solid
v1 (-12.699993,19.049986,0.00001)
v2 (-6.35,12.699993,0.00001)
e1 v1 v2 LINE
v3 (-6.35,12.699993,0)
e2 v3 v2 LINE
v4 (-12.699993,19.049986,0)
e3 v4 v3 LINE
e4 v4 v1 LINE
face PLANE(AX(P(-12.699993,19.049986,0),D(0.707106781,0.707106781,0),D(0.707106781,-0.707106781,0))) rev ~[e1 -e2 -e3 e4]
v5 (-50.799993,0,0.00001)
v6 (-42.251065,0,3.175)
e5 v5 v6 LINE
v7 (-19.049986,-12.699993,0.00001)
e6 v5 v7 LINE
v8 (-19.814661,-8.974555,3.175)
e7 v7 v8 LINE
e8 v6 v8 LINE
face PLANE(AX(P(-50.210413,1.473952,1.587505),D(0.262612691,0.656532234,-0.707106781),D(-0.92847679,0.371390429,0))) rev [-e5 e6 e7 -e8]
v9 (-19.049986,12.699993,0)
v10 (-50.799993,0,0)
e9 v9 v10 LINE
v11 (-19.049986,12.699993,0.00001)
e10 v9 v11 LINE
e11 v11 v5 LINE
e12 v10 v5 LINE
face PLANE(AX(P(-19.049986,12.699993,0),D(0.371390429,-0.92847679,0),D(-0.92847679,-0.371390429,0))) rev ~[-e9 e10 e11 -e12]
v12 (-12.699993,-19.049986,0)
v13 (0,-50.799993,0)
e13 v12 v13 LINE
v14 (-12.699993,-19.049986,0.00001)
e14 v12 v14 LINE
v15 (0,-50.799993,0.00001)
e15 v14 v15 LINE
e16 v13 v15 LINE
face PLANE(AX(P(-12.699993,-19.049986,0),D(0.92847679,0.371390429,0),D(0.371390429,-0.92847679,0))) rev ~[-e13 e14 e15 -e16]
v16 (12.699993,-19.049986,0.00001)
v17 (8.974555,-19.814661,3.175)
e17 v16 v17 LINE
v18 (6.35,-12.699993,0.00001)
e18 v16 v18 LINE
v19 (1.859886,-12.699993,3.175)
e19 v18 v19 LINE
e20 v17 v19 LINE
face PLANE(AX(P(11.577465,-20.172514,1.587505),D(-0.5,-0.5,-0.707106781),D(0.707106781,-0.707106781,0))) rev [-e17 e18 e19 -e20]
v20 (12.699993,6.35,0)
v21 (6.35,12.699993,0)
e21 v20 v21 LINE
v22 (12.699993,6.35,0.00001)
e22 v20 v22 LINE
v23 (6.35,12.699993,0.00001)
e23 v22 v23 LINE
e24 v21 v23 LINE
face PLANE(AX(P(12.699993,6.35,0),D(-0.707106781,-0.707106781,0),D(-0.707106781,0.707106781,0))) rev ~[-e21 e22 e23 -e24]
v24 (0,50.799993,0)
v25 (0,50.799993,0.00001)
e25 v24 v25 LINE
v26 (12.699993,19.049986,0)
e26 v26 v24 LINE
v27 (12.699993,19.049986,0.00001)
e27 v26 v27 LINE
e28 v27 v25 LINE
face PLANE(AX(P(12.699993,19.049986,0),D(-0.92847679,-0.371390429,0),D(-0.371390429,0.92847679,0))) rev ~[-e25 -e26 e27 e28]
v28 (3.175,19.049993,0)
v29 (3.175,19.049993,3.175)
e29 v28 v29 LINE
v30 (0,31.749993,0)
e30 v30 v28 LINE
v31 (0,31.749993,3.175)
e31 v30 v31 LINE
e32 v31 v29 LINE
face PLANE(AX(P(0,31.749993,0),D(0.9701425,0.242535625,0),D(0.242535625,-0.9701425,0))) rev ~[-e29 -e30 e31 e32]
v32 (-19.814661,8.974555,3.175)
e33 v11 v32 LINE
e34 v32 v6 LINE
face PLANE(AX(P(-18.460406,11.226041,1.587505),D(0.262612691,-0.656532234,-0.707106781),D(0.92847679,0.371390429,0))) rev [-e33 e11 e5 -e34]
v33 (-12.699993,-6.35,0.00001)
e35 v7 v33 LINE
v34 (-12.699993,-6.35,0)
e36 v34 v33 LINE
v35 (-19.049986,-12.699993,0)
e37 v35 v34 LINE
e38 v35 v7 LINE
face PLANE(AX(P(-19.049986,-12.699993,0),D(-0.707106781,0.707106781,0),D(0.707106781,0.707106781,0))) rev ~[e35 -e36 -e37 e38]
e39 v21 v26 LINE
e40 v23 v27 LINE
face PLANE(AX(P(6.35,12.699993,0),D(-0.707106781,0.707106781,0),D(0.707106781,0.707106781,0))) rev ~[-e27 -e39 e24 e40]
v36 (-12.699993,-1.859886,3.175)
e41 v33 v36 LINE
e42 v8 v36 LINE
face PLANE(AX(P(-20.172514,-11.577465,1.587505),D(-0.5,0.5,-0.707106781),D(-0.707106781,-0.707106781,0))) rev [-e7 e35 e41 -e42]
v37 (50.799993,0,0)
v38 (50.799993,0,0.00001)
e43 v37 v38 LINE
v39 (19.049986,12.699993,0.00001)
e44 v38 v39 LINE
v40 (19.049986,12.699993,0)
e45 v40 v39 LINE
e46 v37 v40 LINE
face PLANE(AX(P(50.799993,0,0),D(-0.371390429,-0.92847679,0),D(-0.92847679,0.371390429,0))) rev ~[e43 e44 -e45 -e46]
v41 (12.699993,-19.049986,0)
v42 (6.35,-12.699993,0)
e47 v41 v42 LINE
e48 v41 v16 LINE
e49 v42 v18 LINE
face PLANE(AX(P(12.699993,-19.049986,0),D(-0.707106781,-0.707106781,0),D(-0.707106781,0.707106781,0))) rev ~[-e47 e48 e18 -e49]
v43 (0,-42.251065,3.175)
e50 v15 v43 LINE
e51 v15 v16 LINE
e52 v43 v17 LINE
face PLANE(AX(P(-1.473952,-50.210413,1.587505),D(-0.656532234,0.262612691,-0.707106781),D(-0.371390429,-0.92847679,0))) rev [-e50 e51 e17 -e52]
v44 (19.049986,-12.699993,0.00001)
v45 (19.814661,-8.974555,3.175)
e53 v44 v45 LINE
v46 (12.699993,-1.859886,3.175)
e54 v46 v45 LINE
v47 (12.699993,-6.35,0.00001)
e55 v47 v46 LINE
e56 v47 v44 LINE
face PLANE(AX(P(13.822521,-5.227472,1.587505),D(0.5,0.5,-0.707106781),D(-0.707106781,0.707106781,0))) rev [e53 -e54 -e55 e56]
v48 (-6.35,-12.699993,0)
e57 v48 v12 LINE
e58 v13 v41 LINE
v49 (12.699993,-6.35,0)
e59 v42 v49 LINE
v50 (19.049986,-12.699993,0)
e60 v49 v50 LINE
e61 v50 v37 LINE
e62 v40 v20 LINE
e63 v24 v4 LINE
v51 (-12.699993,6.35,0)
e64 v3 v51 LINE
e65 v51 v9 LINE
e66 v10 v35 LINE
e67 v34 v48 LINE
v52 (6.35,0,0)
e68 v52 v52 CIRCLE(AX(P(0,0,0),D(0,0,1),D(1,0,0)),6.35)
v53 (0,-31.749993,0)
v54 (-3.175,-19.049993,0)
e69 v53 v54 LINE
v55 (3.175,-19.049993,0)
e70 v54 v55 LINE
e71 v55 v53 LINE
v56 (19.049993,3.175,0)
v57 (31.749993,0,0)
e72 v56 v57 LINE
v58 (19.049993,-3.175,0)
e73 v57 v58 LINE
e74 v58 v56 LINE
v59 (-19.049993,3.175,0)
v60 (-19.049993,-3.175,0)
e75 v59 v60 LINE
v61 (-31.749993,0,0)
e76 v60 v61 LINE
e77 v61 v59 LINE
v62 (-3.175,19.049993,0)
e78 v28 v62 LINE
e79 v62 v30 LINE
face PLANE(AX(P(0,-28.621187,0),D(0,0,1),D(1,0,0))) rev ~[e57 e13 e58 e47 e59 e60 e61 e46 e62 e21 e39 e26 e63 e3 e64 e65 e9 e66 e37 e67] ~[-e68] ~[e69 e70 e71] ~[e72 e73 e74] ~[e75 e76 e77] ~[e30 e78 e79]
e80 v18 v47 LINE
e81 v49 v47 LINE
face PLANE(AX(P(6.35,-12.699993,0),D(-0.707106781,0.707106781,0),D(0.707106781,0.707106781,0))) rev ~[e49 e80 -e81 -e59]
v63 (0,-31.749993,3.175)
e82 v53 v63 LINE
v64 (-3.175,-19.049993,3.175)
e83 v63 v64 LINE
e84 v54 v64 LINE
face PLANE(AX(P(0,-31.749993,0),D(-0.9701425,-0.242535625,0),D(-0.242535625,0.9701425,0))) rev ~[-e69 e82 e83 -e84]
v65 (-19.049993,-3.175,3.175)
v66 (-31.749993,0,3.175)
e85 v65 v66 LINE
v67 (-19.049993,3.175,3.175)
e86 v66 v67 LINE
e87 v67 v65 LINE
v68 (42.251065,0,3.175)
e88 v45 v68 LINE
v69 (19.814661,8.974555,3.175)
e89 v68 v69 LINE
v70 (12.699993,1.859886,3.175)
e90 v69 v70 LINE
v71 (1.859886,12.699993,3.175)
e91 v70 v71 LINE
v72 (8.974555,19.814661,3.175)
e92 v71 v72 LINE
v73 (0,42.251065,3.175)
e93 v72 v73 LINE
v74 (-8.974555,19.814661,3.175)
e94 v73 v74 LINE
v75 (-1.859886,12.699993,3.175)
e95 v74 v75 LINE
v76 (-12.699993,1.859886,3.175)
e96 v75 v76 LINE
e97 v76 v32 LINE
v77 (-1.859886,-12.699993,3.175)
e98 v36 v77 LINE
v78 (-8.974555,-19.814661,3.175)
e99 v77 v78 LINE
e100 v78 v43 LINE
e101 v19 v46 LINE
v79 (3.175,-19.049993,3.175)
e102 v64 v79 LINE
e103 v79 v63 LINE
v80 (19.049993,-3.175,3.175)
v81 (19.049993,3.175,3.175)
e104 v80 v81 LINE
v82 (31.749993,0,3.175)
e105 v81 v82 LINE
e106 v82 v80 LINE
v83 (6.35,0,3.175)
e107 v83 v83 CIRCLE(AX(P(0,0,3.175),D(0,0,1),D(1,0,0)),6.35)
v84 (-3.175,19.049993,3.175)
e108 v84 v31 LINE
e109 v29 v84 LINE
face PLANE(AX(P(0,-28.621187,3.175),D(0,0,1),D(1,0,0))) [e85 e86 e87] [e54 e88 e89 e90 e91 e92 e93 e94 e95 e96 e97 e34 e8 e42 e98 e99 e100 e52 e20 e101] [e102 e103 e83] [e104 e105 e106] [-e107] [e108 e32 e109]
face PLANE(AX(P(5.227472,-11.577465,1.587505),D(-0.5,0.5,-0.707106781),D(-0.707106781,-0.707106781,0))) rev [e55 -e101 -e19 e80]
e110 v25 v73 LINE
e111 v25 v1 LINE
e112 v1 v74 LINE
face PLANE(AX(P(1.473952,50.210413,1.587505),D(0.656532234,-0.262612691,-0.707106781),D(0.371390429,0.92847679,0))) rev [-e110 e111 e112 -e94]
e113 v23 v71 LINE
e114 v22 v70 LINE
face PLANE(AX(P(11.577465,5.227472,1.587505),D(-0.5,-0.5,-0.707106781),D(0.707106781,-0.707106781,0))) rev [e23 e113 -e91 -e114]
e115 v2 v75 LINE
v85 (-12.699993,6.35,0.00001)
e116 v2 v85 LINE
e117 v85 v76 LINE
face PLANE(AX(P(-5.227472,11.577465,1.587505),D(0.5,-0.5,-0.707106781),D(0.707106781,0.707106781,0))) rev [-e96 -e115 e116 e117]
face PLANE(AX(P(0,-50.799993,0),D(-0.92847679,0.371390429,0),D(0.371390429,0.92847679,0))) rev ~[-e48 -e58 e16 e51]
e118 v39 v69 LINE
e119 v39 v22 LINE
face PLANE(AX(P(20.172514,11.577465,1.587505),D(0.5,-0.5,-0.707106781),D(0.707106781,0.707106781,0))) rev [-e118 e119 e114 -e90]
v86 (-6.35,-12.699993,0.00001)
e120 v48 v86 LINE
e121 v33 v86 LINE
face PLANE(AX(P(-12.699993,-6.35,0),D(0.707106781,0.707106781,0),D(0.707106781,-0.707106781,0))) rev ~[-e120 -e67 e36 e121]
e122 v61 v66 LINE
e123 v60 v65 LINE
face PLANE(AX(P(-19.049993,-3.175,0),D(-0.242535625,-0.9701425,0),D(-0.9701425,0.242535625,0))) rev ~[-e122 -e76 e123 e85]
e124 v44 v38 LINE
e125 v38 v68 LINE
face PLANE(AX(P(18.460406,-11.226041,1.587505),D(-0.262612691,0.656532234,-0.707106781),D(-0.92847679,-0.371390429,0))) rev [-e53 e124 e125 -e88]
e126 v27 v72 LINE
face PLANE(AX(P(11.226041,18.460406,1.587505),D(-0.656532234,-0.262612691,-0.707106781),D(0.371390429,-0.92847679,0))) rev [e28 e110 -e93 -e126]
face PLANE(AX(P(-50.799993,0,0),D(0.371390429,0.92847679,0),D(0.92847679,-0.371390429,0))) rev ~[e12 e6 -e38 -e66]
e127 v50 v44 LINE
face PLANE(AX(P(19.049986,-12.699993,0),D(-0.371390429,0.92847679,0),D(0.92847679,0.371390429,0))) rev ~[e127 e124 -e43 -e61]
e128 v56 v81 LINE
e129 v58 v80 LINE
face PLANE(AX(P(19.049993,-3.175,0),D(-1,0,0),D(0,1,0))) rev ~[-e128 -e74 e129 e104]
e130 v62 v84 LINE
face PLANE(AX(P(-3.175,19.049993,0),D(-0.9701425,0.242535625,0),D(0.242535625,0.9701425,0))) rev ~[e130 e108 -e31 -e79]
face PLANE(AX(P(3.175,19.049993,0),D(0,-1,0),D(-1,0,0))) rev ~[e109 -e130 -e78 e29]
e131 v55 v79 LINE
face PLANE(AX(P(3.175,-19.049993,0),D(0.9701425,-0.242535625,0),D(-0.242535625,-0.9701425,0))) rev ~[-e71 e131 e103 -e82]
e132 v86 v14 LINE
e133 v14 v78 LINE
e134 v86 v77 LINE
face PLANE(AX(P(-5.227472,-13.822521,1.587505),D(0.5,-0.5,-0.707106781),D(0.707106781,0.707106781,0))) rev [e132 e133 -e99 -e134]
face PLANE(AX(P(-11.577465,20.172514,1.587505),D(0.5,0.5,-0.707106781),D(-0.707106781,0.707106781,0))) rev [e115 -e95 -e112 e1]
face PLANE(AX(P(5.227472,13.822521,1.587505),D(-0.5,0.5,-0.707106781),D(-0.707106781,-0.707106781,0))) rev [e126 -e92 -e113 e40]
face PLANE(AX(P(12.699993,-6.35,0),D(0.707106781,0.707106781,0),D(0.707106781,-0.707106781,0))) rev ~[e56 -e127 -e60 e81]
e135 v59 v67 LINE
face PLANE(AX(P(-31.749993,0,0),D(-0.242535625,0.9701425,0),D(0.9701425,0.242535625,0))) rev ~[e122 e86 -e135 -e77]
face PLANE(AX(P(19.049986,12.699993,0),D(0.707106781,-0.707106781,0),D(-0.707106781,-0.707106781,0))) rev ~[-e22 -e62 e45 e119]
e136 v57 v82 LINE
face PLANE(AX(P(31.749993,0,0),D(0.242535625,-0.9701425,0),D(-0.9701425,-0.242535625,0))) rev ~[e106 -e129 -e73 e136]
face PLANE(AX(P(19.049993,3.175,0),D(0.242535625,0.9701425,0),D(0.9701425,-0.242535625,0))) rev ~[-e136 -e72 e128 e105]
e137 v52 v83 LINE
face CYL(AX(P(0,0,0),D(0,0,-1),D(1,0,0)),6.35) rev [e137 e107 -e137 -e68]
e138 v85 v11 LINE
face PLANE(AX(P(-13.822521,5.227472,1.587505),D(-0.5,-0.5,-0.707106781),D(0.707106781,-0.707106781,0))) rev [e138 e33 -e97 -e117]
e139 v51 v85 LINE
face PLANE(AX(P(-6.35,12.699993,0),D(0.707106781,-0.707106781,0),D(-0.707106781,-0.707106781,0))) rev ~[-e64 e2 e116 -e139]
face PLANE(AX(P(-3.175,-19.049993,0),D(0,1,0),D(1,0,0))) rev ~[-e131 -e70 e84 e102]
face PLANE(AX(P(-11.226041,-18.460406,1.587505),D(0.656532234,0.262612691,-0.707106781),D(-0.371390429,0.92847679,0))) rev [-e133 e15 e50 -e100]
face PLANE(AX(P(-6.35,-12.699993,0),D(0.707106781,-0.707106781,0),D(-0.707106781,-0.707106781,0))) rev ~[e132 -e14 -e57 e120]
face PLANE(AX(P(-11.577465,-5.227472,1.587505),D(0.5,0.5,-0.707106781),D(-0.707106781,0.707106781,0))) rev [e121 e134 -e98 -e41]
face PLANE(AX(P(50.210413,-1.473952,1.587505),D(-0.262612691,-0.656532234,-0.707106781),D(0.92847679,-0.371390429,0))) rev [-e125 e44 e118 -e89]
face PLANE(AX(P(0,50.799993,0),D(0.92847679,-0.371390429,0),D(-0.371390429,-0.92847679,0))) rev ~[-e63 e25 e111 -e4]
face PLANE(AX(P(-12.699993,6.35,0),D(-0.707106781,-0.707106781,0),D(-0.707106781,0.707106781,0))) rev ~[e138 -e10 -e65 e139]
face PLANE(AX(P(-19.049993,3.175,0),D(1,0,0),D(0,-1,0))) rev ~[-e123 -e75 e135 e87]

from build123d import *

# Parameters (mm, degrees)
F0_R     = 6.35
F1_DEPTH = 3.175
F2_SIZE  = 3.17499


# Not quite as in the source:
# - a fillet or chamfer is up to 0.001 mm smaller than in the source, because OpenCascade refuses the exact size


with BuildPart() as f1:
    # F0 (on Top) → F1 (new body)
    with BuildSketch(Plane.XY):
        Polygon((6.35, -12.6999929847), (-6.35, -12.6999929847), (-12.6999929847, -19.0499859695), (0, -50.7999929847), (12.6999929847, -19.0499859695), align=None)
        Polygon((-3.175, -19.0499929847), (3.175, -19.0499929847), (0, -31.7499929847), align=None, mode=Mode.SUBTRACT)
        Polygon((19.0499859695, 12.6999929847), (12.6999929847, 6.35), (12.6999929847, -6.35), (19.0499859695, -12.6999929847), (50.7999929847, 0), align=None)
        Polygon((19.0499929847, -3.175), (19.0499929847, 3.175), (31.7499929847, 0), align=None, mode=Mode.SUBTRACT)
        Polygon((-6.35, 12.6999929847), (-12.6999929847, 6.35), (-12.6999929847, -6.35), (-6.35, -12.6999929847), (6.35, -12.6999929847), (12.6999929847, -6.35), (12.6999929847, 6.35), (6.35, 12.6999929847), align=None)
        Circle(F0_R, mode=Mode.SUBTRACT)
        Polygon((-12.6999929847, -6.35), (-12.6999929847, 6.35), (-19.0499859695, 12.6999929847), (-50.7999929847, 0), (-19.0499859695, -12.6999929847), align=None)
        Polygon((-19.0499929847, 3.175), (-19.0499929847, -3.175), (-31.7499929847, 0), align=None, mode=Mode.SUBTRACT)
        Polygon((-12.6999929847, 19.0499859695), (-6.35, 12.6999929847), (6.35, 12.6999929847), (12.6999929847, 19.0499859695), (0, 50.7999929847), align=None)
        Polygon((3.175, 19.0499929847), (-3.175, 19.0499929847), (0, 31.7499929847), align=None, mode=Mode.SUBTRACT)
    extrude(amount=F1_DEPTH)

    # F2 (size 3.175 in the source; OpenCascade refuses exactly that, so slightly less here)
    f2_edges = [f1.edges().sort_by_distance(p)[0] for p in [
        (6.349996, -34.924989, 3.175),
        (-6.349996, -34.924989, 3.175),
        (-9.524996, -15.874989, 3.175),
        (9.524996, -15.874989, 3.175),
        (34.924989, -6.349996, 3.175),
        (15.874989, -9.524996, 3.175),
        (34.924989, 6.349996, 3.175),
        (15.874989, 9.524996, 3.175),
        (9.524996, -9.524996, 3.175),
        (-9.524996, -9.524996, 3.175),
        (-15.874989, -9.524996, 3.175),
        (-34.924989, -6.349996, 3.175),
        (-34.924989, 6.349996, 3.175),
        (-15.874989, 9.524996, 3.175),
        (-9.524996, 9.524996, 3.175),
        (9.524996, 9.524996, 3.175),
        (-9.524996, 15.874989, 3.175),
        (-6.349996, 34.924989, 3.175),
        (6.349996, 34.924989, 3.175),
        (9.524996, 15.874989, 3.175),
    ]]
    chamfer(f2_edges, length=F2_SIZE)


solid = f1.part
